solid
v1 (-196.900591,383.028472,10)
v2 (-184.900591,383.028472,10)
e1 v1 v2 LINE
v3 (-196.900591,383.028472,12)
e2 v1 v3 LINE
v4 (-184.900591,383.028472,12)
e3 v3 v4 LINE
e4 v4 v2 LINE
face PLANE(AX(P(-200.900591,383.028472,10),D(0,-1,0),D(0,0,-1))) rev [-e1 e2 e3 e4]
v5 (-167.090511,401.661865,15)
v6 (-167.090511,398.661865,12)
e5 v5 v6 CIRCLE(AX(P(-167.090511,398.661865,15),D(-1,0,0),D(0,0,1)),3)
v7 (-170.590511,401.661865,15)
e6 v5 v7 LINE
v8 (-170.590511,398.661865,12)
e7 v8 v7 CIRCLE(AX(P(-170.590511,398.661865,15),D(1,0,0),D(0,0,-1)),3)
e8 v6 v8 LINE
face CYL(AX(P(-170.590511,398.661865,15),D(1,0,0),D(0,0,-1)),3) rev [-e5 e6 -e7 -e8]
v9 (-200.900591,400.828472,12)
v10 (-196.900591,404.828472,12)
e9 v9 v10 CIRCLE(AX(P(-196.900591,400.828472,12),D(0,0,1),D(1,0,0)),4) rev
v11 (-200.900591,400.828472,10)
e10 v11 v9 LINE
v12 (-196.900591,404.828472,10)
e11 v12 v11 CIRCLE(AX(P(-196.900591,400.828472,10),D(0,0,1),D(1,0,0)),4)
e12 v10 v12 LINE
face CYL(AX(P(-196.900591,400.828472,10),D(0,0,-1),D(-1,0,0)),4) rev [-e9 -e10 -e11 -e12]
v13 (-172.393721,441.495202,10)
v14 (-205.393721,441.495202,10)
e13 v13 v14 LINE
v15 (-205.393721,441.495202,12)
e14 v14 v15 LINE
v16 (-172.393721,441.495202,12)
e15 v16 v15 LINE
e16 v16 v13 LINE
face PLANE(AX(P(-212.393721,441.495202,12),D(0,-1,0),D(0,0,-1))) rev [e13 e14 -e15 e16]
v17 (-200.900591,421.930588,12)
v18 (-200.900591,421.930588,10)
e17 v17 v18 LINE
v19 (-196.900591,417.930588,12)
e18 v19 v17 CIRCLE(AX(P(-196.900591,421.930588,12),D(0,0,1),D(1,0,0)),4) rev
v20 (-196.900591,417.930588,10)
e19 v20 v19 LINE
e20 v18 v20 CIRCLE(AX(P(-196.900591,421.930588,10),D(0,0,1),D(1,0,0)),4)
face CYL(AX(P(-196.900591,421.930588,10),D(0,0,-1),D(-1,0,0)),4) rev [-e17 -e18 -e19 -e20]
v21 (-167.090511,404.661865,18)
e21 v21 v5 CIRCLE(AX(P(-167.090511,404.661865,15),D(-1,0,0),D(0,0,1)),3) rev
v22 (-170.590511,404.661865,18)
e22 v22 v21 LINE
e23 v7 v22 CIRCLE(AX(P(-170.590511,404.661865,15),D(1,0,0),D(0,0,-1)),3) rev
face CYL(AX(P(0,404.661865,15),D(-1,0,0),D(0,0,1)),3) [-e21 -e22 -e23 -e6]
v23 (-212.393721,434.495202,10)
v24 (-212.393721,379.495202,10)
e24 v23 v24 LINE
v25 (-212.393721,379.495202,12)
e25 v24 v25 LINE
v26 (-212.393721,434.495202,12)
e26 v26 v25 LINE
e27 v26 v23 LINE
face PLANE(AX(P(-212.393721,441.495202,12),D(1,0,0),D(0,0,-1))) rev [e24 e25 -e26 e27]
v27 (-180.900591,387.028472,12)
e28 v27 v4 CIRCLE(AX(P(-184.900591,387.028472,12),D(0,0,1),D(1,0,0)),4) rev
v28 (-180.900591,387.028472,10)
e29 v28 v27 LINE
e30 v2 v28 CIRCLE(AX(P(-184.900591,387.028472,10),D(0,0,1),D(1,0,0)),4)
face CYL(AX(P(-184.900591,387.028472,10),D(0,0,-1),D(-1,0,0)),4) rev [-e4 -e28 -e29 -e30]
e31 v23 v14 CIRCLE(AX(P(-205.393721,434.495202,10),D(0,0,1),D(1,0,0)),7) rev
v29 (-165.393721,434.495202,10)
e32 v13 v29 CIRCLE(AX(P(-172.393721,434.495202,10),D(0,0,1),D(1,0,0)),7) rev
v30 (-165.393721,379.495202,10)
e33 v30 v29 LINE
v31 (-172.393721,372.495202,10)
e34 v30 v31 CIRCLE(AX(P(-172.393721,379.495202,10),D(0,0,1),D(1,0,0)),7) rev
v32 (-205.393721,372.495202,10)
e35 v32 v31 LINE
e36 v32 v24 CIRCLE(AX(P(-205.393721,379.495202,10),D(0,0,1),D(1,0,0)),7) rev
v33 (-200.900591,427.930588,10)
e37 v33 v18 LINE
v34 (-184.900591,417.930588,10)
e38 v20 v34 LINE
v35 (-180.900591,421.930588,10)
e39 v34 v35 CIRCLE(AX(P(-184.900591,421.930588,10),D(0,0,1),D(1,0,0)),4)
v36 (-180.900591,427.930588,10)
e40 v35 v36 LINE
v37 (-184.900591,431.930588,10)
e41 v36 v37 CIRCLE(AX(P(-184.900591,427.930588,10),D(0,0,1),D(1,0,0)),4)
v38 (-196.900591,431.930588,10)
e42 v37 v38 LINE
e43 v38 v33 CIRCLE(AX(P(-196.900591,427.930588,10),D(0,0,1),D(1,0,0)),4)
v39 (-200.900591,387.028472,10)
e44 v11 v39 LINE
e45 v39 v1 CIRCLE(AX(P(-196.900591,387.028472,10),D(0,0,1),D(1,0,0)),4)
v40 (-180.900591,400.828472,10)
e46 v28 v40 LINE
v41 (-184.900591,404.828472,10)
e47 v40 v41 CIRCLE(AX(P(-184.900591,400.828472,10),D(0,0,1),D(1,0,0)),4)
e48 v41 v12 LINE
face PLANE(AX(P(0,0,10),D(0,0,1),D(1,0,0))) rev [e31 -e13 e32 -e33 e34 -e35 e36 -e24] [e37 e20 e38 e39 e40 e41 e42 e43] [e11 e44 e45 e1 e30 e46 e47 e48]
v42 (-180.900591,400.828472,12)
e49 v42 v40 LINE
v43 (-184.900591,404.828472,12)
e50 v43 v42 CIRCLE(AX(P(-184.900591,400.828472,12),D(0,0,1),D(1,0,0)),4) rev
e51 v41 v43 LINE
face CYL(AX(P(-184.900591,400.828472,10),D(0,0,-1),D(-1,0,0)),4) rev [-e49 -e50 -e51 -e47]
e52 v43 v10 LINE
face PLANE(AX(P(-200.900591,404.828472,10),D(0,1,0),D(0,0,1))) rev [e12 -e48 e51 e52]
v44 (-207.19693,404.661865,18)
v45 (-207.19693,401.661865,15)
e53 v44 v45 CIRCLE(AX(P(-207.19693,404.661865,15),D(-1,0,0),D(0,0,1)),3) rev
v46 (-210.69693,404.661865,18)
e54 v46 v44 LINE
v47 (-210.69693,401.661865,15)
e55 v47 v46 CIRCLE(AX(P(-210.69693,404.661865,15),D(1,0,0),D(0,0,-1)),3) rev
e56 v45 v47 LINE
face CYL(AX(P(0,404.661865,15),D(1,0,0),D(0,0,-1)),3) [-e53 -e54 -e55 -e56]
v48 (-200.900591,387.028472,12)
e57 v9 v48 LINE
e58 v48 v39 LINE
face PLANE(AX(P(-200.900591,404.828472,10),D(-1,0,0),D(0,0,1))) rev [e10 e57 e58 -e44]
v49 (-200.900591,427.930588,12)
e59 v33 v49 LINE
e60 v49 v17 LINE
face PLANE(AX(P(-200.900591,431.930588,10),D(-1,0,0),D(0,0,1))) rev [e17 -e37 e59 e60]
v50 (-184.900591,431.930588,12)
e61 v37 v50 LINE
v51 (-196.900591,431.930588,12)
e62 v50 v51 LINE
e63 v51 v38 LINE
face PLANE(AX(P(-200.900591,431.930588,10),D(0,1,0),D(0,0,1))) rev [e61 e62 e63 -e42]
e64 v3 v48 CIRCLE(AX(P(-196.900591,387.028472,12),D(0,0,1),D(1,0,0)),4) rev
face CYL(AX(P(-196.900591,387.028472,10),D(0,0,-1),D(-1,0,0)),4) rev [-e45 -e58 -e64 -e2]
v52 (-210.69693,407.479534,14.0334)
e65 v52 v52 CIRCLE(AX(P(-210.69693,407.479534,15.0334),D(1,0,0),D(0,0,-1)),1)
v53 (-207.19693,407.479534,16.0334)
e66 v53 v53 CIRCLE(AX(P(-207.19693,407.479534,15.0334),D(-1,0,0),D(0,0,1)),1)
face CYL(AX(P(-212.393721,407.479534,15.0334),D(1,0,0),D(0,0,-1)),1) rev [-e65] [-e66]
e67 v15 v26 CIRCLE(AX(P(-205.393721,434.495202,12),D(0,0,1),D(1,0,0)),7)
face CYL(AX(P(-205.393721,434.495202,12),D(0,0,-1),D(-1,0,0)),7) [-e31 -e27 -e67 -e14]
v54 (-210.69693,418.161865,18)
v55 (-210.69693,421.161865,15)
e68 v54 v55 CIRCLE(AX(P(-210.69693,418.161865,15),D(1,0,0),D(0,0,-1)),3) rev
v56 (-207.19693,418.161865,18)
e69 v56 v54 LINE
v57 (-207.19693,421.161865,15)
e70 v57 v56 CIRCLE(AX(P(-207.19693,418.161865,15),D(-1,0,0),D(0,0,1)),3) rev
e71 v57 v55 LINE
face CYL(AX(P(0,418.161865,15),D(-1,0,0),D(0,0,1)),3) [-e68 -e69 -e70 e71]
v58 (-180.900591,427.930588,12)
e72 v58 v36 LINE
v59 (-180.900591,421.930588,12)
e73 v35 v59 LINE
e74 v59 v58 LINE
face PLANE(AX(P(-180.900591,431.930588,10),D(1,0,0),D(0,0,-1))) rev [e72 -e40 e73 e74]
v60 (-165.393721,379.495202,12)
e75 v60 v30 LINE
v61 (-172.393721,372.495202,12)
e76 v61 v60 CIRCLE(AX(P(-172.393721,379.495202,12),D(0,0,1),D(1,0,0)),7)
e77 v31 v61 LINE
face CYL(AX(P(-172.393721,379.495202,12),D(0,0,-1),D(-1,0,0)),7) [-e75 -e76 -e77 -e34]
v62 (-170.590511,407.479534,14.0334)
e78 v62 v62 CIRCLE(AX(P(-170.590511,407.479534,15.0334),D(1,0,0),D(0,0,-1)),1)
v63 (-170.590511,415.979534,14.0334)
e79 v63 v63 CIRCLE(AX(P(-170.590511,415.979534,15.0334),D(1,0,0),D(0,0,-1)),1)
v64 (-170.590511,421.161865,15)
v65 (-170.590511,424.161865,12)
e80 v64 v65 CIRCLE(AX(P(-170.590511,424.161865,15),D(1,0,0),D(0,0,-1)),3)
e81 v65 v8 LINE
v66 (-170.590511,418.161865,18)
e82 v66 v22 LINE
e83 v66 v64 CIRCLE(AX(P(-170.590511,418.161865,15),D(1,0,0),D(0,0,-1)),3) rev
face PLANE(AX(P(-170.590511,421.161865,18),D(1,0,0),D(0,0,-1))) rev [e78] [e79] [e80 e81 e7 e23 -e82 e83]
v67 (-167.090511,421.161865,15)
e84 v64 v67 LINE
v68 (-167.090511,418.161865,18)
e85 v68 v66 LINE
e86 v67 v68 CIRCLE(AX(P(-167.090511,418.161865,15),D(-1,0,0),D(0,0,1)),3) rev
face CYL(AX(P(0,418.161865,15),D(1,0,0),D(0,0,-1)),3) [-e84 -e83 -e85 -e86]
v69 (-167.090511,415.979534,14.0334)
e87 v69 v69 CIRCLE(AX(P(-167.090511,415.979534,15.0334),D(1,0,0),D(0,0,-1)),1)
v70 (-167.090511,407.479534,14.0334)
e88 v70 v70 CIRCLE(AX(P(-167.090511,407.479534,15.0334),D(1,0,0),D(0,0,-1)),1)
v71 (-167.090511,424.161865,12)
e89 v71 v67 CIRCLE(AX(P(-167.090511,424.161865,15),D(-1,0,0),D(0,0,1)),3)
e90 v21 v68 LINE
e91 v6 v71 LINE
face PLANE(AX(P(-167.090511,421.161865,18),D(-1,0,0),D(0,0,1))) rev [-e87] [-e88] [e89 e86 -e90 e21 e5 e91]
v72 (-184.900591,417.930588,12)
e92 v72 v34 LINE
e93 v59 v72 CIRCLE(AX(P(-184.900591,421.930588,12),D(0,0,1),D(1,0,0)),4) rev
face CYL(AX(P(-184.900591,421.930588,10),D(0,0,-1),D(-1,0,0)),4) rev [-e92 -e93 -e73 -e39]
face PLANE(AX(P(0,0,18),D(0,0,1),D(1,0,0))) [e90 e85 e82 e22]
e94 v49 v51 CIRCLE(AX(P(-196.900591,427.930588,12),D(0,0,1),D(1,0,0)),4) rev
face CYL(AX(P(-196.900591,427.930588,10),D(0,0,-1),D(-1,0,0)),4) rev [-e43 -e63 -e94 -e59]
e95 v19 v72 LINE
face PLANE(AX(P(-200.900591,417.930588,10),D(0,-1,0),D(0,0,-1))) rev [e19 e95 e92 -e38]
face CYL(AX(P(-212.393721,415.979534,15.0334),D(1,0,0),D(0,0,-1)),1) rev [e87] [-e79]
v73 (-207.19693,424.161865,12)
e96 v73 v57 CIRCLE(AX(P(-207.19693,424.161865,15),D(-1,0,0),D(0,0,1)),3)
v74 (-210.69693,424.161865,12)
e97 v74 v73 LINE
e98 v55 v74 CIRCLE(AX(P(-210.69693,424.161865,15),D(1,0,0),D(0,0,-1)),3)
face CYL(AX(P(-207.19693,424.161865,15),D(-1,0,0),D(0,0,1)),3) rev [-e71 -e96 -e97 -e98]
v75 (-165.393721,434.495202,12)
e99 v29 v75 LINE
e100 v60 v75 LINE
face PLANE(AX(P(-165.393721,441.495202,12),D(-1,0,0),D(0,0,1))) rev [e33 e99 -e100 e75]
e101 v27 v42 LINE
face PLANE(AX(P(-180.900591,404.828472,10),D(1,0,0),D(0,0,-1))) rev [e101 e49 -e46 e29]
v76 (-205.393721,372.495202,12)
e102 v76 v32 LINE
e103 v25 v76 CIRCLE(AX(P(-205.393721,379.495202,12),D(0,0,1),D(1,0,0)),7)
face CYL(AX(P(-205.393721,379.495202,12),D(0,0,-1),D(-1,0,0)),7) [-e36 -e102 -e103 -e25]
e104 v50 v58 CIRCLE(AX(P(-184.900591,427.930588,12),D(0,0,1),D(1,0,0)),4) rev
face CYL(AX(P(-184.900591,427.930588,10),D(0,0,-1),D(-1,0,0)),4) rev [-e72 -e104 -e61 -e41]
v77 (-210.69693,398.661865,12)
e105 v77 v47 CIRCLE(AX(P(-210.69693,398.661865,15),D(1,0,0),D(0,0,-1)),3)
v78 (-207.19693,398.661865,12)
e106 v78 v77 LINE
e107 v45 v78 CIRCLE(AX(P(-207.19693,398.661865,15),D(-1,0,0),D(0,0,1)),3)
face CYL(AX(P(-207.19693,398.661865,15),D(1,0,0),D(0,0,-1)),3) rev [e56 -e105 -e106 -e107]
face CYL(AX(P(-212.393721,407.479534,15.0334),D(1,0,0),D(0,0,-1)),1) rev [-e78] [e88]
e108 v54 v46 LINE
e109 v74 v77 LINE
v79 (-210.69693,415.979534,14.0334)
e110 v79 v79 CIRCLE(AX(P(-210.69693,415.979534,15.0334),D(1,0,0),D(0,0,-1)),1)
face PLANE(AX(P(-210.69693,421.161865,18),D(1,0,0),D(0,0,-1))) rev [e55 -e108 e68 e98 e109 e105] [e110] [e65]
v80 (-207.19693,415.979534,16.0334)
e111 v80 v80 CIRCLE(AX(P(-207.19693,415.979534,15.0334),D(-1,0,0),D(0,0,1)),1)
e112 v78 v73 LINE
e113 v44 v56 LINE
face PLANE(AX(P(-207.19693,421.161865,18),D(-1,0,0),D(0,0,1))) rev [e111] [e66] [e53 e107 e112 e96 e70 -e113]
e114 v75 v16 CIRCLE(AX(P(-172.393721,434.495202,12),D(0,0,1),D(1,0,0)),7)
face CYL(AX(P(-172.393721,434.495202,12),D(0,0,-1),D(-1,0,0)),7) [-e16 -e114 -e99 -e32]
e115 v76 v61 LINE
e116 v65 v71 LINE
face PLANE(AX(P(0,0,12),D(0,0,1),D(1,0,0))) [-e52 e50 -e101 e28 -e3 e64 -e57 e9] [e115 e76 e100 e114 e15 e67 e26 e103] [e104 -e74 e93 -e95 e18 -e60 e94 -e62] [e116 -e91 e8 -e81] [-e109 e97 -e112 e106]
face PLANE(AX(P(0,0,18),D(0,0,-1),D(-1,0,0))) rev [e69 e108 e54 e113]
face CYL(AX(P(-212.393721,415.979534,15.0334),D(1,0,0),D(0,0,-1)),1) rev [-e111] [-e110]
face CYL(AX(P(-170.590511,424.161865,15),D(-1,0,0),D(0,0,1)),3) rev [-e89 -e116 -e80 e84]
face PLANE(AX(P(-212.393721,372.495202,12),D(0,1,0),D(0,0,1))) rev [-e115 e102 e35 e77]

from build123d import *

# Parameters (mm, degrees)
SKETCH1_W           = 47
SKETCH1_H           = 69
BOSS_EXTRUDE1_DEPTH = 2
FILLET1_R           = 7
SKETCH2_W           = 20
SKETCH2_H           = 14
SKETCH2_H_2         = 21.8
CUT_EXTRUDE1_DEPTH  = 2
FILLET2_R           = 4
SKETCH4_W           = 3.5
SKETCH4_H           = 19.5
BOSS_EXTRUDE2_DEPTH = 6
FILLET3_START       = -210.696929932
FILLET3_DEPTH       = 43.606418674
FILLET3_2_DEPTH     = 3.5
FILLET3_START_2     = -170.590511258
FILLET3_3_DEPTH     = 3.5
SKETCH5_R           = 1
CUT_EXTRUDE2_DEPTH  = 445.178336025


with BuildPart() as part:
    # Sketch1 → Boss-Extrude1 (new body)
    with BuildSketch(Plane.XY.offset(10)):
        with Locations((-188.893720595, 406.995202033)):
            Rectangle(SKETCH1_W, SKETCH1_H)
    extrude(amount=BOSS_EXTRUDE1_DEPTH)

    # Fillet1
    fillet1_edges = [part.edges().sort_by_distance(p)[0] for p in [
        (-212.393720595, 441.495202033, 11),
        (-165.393720595, 441.495202033, 11),
        (-165.393720595, 372.495202033, 11),
        (-212.393720595, 372.495202033, 11),
    ]]
    fillet(fillet1_edges, radius=FILLET1_R)

    # Sketch2 → Cut-Extrude1 (cut)
    with BuildSketch(Plane.XY.offset(12)):
        with Locations((-190.900590621, 424.93058769)):
            Rectangle(SKETCH2_W, SKETCH2_H)
        with Locations((-190.900590621, 393.92847215)):
            Rectangle(SKETCH2_W, SKETCH2_H_2)
    extrude(amount=-CUT_EXTRUDE1_DEPTH, mode=Mode.SUBTRACT)

    # Fillet2
    fillet2_edges = [part.edges().sort_by_distance(p)[0] for p in [
        (-200.900590621, 417.93058769, 11),
        (-200.900590621, 431.93058769, 11),
        (-180.900590621, 431.93058769, 11),
        (-180.900590621, 417.93058769, 11),
        (-200.900590621, 383.02847215, 11),
        (-200.900590621, 404.82847215, 11),
        (-180.900590621, 404.82847215, 11),
        (-180.900590621, 383.02847215, 11),
    ]]
    fillet(fillet2_edges, radius=FILLET2_R)

    # Sketch4 → Boss-Extrude2 (add)
    with BuildSketch(Plane.XY.offset(12)):
        with Locations((-168.840511258, 411.411865234)):
            Rectangle(SKETCH4_W, SKETCH4_H)
        with Locations((-208.946929932, 411.411865234)):
            Rectangle(SKETCH4_W, SKETCH4_H)
    extrude(amount=BOSS_EXTRUDE2_DEPTH)

    # Fillet3: read off the stored shape, not the designer's step
    # Fillet3 outline → Fillet3 (cut)
    with BuildSketch(Plane.YZ.offset(FILLET3_START)):
        with BuildLine():
            ThreePointArc((418.161865234, 18), (420.283185578, 17.121320344), (421.161865234, 15))
            Line((421.161865234, 15), (421.161865234, 18))
            Line((421.161865234, 18), (418.161865234, 18))
        make_face()
        with BuildLine():
            ThreePointArc((401.661865234, 15), (402.540544891, 17.121320343), (404.661865234, 18))
            Line((404.661865234, 18), (401.661865234, 18))
            Line((401.661865234, 18), (401.661865234, 15))
        make_face()
    extrude(amount=FILLET3_DEPTH, mode=Mode.SUBTRACT)

    # Fillet3 2 outline → Fillet3 2 (add)
    with BuildSketch(Plane.YZ.offset(FILLET3_START)):
        with BuildLine():
            Line((421.161865234, 12), (424.161865234, 12))
            ThreePointArc((424.161865234, 12), (422.040544891, 12.878679657), (421.161865234, 15))
            Line((421.161865234, 15), (421.161865234, 12))
        make_face()
        with BuildLine():
            Line((398.661865234, 12), (401.661865234, 12))
            Line((401.661865234, 12), (401.661865234, 15))
            ThreePointArc((401.661865234, 15), (400.783185578, 12.878679656), (398.661865234, 12))
        make_face()
    extrude(amount=FILLET3_2_DEPTH)

    # Fillet3 3 outline → Fillet3 3 (add)
    with BuildSketch(Plane.YZ.offset(FILLET3_START_2)):
        with BuildLine():
            Line((421.161865234, 12), (424.161865234, 12))
            ThreePointArc((424.161865234, 12), (422.040544891, 12.878679657), (421.161865234, 15))
            Line((421.161865234, 15), (421.161865234, 12))
        make_face()
        with BuildLine():
            Line((398.661865234, 12), (401.661865234, 12))
            Line((401.661865234, 12), (401.661865234, 15))
            ThreePointArc((401.661865234, 15), (400.783185578, 12.878679656), (398.661865234, 12))
        make_face()
    extrude(amount=FILLET3_3_DEPTH)

    # Sketch5 → Cut-Extrude2 (cut, through all)
    with BuildSketch(Plane(origin=(-167.090511258, 0, 0), x_dir=(0, 0, -1), z_dir=(1, 0, 0))):
        with Locations((-15.033399781, 407.479533559)):
            Circle(SKETCH5_R)
        with Locations((-15.033399781, 415.979533559)):
            Circle(SKETCH5_R)
    extrude(amount=-CUT_EXTRUDE2_DEPTH, mode=Mode.SUBTRACT)


solid = part.part
